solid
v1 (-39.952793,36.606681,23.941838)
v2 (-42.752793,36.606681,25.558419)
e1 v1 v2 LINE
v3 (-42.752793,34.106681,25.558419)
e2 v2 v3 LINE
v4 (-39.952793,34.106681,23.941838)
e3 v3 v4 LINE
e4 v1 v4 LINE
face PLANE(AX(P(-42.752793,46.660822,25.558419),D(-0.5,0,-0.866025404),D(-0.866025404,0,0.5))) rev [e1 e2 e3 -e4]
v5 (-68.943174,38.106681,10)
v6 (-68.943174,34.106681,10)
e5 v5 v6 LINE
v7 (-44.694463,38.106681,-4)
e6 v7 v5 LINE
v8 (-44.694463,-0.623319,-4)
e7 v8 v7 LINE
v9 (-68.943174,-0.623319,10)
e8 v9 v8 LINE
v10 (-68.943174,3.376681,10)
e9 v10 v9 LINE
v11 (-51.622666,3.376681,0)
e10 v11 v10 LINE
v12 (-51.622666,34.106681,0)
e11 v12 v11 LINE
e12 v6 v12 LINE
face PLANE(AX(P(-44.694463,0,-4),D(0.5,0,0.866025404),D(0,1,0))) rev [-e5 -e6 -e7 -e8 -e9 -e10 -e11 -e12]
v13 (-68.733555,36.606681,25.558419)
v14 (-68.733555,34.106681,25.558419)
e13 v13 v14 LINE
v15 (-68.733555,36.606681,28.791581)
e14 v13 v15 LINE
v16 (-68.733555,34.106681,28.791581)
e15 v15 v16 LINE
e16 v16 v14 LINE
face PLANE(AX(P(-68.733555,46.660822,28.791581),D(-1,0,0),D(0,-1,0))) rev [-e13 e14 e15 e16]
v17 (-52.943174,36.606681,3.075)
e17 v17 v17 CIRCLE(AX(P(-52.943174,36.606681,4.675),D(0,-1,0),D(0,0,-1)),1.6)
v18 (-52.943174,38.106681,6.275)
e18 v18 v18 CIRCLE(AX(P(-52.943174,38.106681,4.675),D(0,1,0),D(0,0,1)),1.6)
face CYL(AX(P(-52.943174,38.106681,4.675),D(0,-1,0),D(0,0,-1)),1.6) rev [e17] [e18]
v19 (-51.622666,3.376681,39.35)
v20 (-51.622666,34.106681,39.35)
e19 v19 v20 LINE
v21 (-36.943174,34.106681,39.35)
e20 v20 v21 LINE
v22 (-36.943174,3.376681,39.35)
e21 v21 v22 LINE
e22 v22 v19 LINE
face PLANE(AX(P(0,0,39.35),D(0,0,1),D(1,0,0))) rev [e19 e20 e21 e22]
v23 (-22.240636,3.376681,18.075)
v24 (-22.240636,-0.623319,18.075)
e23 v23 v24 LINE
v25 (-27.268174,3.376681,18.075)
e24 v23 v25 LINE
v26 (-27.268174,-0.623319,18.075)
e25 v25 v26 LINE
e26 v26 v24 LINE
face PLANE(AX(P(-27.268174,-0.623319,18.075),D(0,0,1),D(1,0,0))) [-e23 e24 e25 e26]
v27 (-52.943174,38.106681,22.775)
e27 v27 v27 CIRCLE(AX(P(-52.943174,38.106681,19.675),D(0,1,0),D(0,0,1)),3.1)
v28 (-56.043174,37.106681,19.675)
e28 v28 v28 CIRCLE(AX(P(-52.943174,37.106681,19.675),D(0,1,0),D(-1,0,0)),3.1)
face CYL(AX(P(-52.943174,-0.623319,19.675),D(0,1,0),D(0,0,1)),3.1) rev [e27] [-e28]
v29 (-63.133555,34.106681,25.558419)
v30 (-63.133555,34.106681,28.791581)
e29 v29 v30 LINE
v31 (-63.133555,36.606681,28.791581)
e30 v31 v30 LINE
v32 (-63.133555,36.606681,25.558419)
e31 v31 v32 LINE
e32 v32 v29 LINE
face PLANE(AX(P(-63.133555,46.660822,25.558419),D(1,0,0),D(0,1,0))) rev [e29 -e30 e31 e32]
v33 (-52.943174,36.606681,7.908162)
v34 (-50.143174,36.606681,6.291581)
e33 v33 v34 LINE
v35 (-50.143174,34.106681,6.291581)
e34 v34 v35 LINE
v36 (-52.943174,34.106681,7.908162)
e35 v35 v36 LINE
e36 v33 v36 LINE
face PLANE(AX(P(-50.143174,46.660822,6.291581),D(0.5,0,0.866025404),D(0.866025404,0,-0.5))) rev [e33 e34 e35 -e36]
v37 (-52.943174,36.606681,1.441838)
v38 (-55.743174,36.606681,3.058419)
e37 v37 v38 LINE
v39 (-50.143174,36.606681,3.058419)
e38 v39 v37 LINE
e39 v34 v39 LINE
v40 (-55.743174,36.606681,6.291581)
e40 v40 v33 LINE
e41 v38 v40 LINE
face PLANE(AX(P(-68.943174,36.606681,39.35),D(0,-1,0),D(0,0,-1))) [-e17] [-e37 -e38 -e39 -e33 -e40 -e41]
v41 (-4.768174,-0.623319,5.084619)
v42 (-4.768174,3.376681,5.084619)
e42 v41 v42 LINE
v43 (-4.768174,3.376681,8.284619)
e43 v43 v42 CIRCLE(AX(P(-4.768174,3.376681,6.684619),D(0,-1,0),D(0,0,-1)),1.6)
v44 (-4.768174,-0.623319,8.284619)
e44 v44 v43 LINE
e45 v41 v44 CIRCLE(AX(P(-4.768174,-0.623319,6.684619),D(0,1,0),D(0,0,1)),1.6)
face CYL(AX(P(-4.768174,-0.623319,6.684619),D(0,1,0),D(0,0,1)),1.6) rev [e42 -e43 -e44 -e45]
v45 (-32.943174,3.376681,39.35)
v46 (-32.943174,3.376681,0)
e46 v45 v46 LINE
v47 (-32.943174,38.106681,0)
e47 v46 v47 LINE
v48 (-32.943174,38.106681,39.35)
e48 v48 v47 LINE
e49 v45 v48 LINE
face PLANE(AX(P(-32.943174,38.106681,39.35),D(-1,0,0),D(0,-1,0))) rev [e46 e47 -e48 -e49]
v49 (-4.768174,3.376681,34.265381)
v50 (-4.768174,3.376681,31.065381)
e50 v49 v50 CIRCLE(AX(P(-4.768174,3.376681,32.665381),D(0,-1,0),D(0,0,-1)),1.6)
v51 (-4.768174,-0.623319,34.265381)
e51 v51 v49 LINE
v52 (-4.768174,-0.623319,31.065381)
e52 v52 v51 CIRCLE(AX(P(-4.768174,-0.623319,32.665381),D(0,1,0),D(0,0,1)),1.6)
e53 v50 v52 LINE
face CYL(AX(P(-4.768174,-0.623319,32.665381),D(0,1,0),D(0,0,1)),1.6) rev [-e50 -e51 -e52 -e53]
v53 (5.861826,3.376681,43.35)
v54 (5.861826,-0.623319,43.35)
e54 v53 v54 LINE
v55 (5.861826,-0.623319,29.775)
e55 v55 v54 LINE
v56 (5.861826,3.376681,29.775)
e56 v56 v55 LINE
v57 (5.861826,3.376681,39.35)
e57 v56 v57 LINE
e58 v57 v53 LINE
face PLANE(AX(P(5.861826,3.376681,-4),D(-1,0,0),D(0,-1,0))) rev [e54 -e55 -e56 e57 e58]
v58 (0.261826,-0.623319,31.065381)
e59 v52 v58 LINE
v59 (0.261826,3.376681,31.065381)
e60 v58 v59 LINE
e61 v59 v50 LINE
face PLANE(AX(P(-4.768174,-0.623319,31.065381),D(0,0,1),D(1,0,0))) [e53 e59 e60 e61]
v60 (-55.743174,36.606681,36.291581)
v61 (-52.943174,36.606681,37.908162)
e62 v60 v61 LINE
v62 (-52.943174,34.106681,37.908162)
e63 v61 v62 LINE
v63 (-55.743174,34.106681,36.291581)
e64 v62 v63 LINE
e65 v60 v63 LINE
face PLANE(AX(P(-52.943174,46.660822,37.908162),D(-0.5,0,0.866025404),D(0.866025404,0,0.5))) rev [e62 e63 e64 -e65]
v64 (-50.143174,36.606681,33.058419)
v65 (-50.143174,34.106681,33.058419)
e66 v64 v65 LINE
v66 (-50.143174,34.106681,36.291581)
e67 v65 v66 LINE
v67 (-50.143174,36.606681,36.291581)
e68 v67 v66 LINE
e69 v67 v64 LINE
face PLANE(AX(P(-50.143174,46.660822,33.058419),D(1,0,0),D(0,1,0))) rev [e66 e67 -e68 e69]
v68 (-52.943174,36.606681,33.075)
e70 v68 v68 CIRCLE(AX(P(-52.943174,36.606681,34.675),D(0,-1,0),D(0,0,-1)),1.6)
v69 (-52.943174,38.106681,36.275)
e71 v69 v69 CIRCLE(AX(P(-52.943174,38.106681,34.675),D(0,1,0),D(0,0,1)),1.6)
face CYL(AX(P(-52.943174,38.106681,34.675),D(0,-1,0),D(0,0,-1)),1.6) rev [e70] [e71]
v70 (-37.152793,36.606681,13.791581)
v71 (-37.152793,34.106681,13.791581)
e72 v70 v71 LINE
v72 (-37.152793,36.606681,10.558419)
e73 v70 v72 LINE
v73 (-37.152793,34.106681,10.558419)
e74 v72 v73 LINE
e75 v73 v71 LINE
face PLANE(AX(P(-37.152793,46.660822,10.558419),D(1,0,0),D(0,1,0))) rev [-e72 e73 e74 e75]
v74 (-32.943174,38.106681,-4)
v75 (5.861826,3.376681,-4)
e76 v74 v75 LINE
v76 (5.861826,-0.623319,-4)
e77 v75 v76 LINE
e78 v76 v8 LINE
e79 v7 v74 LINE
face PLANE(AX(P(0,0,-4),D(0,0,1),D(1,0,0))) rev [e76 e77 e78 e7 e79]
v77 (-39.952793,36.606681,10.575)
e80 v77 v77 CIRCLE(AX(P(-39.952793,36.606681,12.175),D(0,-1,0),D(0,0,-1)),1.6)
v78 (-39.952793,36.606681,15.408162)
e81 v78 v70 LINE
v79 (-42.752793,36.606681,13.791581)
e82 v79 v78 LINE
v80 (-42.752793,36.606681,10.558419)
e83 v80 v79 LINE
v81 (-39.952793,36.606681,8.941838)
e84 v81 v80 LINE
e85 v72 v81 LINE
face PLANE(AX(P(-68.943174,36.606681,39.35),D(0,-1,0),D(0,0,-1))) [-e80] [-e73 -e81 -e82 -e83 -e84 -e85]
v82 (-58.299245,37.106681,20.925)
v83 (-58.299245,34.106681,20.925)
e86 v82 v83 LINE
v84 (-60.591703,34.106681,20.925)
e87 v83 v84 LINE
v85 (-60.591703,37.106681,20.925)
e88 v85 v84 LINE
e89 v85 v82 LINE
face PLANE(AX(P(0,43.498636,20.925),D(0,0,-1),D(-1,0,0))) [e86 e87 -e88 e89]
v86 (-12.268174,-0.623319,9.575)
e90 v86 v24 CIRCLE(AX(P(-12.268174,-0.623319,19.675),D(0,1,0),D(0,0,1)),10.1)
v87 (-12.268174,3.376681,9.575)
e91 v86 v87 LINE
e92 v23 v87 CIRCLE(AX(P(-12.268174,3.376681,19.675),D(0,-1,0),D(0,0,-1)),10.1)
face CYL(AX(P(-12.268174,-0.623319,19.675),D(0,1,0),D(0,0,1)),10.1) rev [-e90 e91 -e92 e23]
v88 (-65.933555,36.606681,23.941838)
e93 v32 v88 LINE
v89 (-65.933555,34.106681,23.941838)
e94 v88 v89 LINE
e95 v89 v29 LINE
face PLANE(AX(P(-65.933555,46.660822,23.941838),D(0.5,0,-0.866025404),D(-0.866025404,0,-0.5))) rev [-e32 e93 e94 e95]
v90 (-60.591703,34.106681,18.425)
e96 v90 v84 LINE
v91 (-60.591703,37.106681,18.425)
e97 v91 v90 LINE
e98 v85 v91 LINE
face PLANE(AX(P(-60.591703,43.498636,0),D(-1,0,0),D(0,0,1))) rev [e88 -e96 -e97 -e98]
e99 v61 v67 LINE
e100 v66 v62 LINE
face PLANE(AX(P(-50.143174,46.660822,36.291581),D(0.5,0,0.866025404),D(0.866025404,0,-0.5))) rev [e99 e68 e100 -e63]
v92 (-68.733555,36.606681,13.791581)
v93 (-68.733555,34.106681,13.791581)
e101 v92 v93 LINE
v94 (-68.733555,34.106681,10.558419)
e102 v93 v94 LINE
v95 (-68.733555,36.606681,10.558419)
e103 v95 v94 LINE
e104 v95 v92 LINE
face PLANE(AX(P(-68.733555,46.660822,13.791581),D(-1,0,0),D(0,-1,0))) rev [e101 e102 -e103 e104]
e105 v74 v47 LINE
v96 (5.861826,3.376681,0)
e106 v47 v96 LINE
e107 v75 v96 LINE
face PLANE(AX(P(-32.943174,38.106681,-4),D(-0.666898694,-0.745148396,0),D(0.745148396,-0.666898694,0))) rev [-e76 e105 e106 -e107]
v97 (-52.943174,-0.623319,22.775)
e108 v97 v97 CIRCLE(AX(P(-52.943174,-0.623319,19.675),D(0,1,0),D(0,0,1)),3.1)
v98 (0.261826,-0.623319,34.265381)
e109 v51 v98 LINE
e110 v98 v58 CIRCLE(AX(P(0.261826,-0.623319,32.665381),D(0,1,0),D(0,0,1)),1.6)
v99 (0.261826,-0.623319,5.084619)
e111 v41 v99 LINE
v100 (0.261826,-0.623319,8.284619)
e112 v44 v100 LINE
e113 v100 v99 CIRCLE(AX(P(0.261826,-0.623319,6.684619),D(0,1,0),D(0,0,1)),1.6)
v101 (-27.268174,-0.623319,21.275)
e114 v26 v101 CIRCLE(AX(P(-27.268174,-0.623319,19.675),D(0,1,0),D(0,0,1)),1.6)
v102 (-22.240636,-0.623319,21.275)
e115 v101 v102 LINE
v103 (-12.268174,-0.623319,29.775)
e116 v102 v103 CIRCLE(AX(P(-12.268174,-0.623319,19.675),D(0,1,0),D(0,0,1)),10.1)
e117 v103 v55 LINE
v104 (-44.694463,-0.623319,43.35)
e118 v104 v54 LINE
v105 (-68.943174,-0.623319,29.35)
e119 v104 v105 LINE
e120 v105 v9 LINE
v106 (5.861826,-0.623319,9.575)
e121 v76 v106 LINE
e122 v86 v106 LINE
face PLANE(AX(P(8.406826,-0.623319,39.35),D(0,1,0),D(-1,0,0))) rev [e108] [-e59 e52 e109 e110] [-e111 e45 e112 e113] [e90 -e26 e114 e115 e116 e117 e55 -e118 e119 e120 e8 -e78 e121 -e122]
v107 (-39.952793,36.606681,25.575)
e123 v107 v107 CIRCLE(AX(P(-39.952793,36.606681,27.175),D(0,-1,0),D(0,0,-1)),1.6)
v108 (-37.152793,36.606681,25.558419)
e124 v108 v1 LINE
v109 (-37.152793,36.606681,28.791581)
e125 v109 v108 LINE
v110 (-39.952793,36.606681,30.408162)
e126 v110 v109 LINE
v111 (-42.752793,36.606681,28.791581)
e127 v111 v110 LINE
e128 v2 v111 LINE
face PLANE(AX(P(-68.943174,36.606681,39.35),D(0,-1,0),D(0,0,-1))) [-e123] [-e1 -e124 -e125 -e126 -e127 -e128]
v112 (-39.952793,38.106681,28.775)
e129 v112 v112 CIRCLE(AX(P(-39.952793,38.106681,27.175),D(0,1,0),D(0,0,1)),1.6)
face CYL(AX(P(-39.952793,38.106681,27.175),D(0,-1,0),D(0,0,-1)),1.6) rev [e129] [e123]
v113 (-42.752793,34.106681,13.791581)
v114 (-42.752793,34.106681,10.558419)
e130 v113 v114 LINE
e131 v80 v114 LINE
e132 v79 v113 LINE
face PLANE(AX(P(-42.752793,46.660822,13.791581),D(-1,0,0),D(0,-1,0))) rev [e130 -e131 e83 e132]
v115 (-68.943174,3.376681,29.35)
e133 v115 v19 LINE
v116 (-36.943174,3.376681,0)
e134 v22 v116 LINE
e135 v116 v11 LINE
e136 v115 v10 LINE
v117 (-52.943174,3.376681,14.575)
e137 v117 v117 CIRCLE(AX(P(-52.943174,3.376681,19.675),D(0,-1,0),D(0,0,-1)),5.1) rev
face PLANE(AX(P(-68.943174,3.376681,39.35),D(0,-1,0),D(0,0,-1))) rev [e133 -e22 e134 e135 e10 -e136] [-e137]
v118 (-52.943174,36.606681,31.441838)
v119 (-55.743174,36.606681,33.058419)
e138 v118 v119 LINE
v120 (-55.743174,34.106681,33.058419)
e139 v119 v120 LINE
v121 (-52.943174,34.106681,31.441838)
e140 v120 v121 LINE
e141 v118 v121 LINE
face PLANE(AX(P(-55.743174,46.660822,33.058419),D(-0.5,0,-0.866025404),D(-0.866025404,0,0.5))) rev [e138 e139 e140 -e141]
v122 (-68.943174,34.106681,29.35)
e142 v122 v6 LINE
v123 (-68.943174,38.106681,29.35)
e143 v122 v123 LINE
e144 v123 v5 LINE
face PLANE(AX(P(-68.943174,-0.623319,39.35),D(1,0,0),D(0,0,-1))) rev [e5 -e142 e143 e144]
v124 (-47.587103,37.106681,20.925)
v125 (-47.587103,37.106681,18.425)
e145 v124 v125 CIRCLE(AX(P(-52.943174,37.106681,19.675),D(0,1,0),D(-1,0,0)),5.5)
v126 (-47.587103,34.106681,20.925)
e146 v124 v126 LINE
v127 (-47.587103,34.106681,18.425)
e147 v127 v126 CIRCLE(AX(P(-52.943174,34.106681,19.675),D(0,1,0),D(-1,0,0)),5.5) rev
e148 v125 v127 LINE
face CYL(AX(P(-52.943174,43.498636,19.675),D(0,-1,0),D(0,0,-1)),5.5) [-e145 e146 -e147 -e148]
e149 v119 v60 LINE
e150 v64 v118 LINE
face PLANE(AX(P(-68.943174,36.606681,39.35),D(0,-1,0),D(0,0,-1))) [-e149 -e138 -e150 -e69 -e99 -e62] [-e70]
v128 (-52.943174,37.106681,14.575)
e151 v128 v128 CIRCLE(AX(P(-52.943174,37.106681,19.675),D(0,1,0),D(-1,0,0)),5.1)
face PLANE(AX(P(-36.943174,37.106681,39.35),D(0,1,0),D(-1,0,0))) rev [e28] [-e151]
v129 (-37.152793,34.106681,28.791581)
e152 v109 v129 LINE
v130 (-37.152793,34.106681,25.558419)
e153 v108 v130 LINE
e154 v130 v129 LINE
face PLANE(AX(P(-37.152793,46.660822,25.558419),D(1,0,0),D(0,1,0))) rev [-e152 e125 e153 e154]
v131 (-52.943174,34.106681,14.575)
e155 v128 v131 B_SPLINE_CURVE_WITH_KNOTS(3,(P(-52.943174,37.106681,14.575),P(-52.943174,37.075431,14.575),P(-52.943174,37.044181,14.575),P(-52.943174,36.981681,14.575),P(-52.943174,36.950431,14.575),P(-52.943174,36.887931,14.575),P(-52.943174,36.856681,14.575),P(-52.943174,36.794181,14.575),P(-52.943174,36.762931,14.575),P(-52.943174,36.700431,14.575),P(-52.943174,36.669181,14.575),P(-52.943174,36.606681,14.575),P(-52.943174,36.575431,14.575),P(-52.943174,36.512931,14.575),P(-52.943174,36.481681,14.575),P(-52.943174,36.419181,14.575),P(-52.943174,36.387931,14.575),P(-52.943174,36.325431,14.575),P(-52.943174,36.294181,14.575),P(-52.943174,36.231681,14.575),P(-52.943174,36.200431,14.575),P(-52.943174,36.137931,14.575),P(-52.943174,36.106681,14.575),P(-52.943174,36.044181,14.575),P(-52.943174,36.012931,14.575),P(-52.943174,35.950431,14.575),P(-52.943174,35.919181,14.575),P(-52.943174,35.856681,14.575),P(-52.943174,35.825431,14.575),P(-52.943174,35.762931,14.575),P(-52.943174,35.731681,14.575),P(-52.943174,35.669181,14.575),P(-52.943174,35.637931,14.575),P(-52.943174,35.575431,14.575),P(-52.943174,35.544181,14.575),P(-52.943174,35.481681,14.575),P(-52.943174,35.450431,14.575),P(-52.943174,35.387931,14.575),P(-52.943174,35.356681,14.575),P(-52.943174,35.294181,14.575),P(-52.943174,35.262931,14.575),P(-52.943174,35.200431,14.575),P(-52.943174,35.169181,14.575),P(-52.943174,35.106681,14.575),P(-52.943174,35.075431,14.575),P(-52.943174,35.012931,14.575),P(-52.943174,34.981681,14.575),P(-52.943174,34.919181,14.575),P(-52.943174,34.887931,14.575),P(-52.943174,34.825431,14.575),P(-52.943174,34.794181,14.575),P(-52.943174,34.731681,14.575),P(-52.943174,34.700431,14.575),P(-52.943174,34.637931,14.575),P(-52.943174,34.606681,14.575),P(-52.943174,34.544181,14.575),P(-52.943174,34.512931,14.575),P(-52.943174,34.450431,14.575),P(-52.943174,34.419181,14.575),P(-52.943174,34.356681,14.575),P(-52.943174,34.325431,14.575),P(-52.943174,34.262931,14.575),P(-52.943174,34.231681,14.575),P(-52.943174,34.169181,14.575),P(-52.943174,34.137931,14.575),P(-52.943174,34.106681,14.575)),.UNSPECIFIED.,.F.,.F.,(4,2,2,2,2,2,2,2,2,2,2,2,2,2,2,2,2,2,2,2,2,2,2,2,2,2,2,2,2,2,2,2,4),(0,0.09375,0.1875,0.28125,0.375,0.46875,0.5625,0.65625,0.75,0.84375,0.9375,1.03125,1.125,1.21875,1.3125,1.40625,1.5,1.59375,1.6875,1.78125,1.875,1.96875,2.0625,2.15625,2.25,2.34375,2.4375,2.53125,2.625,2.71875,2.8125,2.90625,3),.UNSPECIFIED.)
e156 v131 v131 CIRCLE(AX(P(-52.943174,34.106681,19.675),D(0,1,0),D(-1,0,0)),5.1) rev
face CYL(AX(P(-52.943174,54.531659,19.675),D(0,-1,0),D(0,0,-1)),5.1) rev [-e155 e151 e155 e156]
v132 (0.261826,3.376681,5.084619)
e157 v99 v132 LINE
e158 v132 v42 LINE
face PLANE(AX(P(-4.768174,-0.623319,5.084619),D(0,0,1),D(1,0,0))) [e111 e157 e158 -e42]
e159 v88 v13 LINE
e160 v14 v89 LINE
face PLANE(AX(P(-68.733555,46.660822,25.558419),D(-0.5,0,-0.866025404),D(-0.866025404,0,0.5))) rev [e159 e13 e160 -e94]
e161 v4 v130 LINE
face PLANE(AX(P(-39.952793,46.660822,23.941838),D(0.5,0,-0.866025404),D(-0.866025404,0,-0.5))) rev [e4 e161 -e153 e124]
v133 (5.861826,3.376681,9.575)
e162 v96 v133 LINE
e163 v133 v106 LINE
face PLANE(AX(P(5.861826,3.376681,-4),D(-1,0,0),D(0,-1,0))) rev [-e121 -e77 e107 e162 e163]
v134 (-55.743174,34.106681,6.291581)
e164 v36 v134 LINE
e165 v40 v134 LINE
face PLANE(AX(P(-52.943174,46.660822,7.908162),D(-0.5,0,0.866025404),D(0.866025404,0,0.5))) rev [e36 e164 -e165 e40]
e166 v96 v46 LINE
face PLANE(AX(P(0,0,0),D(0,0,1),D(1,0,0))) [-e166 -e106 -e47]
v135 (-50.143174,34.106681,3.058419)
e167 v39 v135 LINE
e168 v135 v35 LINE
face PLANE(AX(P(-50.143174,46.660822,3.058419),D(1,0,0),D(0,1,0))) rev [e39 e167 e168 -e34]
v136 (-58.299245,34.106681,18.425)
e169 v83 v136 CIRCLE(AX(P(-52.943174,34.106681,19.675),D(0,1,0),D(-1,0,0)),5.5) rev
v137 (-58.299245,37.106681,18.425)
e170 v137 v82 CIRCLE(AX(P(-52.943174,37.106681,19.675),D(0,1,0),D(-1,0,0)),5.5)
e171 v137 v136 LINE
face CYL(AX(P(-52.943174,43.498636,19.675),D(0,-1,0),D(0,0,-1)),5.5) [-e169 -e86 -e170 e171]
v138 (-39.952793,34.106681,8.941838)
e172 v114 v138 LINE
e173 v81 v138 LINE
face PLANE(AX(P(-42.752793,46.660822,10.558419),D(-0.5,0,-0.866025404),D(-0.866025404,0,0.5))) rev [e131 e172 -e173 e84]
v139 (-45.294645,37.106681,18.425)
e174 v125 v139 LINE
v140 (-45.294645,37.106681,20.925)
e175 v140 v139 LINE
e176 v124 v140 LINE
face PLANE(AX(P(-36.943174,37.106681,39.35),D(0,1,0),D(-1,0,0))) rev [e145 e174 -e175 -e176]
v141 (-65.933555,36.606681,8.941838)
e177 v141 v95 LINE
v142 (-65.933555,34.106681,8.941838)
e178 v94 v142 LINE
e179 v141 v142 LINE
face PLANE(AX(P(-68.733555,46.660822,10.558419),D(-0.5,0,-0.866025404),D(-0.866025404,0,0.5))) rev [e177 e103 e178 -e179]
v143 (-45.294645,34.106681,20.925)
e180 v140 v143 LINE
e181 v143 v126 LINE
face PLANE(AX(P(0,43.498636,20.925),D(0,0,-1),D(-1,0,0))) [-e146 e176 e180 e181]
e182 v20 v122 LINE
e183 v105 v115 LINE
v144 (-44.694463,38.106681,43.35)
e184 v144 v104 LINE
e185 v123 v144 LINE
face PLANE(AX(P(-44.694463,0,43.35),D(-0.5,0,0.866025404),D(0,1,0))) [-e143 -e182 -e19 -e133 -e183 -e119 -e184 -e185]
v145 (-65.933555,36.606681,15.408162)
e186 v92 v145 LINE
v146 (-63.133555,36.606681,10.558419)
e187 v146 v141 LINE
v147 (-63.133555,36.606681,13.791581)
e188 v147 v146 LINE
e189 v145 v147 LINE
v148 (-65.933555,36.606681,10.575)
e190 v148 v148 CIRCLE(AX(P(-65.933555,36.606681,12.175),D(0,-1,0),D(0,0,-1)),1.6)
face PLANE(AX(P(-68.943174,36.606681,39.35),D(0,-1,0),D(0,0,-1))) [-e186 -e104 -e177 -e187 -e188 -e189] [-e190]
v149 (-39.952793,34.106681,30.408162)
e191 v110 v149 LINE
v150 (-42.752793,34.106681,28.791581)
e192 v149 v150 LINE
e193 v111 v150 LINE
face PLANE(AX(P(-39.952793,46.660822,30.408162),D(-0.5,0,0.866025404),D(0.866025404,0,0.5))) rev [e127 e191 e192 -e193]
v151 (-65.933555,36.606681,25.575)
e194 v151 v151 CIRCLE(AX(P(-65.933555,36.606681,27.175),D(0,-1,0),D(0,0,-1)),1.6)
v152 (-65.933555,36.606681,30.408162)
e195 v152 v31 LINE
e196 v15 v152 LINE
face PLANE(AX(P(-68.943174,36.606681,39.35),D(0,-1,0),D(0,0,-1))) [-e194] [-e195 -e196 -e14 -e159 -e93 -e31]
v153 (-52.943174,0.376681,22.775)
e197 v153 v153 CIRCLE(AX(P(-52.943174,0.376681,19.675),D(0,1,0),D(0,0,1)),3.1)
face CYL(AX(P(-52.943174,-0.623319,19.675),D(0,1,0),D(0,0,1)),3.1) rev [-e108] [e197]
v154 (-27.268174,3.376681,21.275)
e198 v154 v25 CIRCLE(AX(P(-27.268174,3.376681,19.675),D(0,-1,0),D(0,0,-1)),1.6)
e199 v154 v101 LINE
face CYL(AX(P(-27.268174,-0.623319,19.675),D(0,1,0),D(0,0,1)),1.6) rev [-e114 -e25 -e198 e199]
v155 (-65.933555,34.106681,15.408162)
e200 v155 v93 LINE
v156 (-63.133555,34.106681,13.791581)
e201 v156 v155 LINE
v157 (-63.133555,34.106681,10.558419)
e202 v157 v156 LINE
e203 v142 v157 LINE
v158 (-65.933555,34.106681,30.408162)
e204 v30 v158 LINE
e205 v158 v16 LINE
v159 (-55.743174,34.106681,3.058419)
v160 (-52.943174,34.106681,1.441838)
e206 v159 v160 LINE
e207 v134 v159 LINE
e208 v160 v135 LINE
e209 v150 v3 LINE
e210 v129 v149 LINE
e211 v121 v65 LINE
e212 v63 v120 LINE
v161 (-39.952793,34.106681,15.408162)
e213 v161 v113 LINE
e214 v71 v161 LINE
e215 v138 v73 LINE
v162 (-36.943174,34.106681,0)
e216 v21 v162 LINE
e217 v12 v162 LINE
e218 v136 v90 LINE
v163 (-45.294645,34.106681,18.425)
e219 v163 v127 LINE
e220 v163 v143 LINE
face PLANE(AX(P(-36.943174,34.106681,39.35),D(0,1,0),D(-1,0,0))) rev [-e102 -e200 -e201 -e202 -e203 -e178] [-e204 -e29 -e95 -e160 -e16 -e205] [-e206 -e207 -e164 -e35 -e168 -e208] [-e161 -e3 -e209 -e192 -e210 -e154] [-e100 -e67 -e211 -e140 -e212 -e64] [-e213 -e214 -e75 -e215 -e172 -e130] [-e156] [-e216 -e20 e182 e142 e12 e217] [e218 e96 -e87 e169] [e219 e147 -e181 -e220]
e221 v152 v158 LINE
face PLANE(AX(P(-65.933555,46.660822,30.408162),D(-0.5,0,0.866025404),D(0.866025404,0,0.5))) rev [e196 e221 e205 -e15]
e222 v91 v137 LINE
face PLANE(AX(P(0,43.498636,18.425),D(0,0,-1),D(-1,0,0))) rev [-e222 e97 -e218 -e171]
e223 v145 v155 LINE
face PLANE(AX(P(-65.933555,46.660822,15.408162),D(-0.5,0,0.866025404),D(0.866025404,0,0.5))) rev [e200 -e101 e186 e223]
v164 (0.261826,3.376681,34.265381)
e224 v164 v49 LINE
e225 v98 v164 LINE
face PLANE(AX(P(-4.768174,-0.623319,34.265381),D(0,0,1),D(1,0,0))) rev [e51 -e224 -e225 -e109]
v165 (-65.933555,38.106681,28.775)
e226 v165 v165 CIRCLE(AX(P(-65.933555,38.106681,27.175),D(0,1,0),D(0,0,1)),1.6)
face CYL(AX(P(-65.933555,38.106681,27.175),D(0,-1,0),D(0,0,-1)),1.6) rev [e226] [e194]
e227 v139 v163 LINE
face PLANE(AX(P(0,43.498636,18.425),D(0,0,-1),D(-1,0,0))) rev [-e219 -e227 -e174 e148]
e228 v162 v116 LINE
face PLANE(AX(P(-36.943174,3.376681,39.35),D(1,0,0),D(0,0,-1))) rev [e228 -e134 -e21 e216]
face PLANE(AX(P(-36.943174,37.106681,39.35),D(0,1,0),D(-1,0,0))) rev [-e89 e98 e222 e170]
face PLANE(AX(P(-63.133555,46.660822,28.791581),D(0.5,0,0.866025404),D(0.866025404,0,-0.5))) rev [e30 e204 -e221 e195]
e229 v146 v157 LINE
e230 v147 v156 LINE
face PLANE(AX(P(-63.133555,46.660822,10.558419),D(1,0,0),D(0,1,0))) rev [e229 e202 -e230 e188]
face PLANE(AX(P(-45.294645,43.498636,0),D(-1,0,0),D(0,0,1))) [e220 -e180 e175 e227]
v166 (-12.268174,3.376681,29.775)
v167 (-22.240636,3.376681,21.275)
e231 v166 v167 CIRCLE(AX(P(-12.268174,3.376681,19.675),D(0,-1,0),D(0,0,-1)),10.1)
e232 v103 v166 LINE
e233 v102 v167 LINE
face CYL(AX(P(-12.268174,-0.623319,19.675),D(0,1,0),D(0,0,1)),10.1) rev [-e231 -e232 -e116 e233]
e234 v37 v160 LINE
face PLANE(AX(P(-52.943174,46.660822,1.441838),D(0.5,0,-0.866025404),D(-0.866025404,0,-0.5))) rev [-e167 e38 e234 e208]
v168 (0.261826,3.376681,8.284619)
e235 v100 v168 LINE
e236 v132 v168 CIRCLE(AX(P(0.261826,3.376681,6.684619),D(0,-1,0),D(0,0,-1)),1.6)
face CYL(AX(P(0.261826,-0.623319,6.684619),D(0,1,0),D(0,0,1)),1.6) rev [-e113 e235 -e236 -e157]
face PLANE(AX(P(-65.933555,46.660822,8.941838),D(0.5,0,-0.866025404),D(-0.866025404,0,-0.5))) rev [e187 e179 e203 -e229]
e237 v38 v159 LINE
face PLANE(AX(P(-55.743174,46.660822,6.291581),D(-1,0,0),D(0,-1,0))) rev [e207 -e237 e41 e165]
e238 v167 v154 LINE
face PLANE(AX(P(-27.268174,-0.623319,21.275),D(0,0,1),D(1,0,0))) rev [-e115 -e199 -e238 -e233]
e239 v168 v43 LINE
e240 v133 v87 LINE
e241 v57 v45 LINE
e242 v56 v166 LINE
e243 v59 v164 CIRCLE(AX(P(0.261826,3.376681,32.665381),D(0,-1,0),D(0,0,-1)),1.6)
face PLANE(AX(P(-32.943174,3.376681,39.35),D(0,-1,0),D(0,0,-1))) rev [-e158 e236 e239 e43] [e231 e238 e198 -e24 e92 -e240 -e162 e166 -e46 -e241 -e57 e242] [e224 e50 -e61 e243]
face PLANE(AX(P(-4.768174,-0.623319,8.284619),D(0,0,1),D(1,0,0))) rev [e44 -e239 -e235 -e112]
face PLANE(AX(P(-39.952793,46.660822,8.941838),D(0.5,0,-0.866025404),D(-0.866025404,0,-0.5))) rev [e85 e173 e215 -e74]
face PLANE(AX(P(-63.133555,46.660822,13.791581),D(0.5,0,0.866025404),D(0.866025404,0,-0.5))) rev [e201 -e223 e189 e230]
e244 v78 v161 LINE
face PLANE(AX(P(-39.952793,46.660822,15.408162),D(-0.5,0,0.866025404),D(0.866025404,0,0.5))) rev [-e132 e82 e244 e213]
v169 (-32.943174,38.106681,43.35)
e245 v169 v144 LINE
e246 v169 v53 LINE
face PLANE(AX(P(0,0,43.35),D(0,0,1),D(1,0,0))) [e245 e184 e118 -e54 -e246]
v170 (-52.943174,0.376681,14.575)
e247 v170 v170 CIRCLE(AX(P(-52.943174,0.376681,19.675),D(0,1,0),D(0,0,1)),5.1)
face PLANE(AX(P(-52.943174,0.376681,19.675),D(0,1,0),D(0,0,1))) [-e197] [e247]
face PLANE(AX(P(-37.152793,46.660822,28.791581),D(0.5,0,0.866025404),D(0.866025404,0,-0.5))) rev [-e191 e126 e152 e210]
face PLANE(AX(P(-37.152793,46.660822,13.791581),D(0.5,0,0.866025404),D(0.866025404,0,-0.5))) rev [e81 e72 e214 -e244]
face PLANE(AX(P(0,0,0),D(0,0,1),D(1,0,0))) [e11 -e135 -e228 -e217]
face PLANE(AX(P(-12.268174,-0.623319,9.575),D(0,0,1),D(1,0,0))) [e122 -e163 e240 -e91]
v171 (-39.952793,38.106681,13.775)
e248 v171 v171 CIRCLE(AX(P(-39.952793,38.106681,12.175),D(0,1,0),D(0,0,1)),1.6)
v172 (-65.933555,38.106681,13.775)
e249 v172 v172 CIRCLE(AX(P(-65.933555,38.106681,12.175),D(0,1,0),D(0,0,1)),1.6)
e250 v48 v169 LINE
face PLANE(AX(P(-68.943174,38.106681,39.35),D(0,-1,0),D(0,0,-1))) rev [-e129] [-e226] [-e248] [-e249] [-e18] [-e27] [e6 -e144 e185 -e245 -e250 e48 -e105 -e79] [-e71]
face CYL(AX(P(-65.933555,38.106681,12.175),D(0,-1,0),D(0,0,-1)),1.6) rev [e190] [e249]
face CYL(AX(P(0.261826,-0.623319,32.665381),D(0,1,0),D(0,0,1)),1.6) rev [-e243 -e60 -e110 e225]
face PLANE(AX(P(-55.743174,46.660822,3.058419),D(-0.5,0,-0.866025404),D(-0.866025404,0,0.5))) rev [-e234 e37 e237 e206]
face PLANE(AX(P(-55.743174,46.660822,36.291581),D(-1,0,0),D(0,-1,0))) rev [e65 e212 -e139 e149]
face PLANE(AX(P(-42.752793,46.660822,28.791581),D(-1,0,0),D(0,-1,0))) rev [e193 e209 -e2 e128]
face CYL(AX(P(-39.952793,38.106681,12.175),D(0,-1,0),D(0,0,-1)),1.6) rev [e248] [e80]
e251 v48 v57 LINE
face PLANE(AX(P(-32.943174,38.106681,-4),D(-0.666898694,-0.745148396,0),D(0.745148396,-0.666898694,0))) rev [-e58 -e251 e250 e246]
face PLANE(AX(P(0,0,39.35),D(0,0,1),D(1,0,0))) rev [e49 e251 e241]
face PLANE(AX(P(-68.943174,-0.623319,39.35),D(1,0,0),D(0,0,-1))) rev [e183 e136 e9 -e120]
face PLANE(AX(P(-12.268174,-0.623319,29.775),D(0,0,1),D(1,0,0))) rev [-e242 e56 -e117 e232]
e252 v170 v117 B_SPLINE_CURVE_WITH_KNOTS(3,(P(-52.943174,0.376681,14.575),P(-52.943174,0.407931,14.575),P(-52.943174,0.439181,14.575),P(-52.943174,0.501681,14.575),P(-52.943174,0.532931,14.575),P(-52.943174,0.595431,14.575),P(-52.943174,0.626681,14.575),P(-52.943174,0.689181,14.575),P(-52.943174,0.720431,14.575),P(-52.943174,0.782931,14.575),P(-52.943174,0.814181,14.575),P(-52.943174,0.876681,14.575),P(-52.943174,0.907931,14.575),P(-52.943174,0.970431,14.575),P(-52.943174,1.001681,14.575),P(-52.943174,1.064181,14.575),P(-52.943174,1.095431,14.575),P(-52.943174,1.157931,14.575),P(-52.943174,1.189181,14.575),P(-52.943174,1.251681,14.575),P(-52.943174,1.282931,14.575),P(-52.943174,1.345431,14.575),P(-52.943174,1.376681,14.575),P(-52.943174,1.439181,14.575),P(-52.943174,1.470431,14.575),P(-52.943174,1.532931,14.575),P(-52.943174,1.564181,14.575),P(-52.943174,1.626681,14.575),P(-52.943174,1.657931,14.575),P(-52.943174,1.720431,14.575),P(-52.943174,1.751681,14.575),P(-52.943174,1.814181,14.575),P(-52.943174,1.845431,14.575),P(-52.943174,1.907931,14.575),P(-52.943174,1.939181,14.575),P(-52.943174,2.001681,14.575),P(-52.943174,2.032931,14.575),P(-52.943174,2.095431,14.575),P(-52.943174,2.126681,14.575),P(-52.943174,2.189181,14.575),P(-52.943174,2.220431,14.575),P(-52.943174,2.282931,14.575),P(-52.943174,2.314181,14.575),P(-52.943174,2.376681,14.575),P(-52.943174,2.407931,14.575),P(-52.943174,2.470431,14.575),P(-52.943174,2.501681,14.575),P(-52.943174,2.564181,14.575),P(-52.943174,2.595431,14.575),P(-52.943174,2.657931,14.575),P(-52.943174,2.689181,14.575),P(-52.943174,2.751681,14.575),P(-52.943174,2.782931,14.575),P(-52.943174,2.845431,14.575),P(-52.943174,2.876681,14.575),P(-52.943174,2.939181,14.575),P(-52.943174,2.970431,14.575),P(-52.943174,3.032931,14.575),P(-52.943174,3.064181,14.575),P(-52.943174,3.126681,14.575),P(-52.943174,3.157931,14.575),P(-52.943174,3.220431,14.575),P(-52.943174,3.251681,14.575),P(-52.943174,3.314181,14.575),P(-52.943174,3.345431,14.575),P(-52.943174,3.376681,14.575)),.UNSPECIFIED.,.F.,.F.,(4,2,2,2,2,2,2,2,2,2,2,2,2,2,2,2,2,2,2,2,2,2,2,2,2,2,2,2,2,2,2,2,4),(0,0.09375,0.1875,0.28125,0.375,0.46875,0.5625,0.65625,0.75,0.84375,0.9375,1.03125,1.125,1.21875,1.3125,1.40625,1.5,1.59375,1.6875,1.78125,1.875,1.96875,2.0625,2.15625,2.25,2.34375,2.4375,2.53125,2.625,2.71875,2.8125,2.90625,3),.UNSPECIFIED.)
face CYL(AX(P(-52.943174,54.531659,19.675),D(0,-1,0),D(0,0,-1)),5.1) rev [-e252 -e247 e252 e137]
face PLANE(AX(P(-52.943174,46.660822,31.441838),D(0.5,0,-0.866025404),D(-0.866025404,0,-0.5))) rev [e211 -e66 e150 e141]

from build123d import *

# Parameters (mm, degrees)
BOSS_EXTRUDE1_DEPTH     = 39.35
CUT_EXTRUDE2_DEPTH      = 33.73
CUT_EXTRUDE2_DEPTH_BACK = 3
SKETCH3_R               = 5.1
CUT_EXTRUDE3_DEPTH      = 33.73
CUT_EXTRUDE4_DEPTH      = 87.647311883
CUT_EXTRUDE4_DEPTH_BACK = 87.647311883
SKETCH3_5_R             = 3.1
SKETCH3_5_R_2           = 10.1
SKETCH3_5_R_3           = 1.6
SKETCH3_5_W             = 20.675
SKETCH3_5_H             = 20.2
SKETCH3_5_W_2           = 5.027537917
SKETCH3_5_H_2           = 3.2
SKETCH3_5_W_3           = 5.03
SKETCH3_6_R             = 1.6
CUT_EXTRUDE5_DEPTH      = 87.647311883
SKETCH4_W               = 77.35
SKETCH4_H               = 38.73
BOSS_EXTRUDE2_DEPTH     = 4
SKETCH5_W               = 77.35
SKETCH5_H               = 38.73
BOSS_EXTRUDE3_DEPTH     = 4
CUT_EXTRUDE6_DEPTH      = 92.909209967
CUT_EXTRUDE6_DEPTH_BACK = 92.909209967
CUT_EXTRUDE7_DEPTH      = 2.5
CHAMFER1_SIZE           = 14
CHAMFER1_SIZE_2         = 24.248711306


with BuildPart() as part:
    # Sketch1 → Boss-Extrude1 (new body)
    with BuildSketch(Plane.XY):
        Polygon((-68.943174111, 38.106680783), (-32.943174111, 38.106680783), (-32.943174111, 3.376680783), (8.406825889, 3.376680783), (8.406825889, -0.623319217), (-68.943174111, -0.623319217), (-68.943174111, 3.376680783), (-36.943174111, 3.376680783), (-36.943174111, 34.106680783), (-68.943174111, 34.106680783), align=None)
    extrude(amount=BOSS_EXTRUDE1_DEPTH)

    # Sketch3 → Cut-Extrude2 (cut, two sides: drawn at the far end of the back side and taken through both)
    with BuildSketch(Plane(origin=(0, 3.376680783, 0), x_dir=(1, 0, 0), z_dir=(0, 1, 0)).offset(-CUT_EXTRUDE2_DEPTH_BACK)):
        with Locations(Location((-52.943174111, -19.675, 0), (0, 0, 90))):
            Circle(SKETCH3_R)
    extrude(amount=CUT_EXTRUDE2_DEPTH + CUT_EXTRUDE2_DEPTH_BACK, mode=Mode.SUBTRACT)

    # Sketch3<4> → Cut-Extrude3 (cut)
    with BuildSketch(Plane(origin=(0, 3.376680783, 0), x_dir=(1, 0, 0), z_dir=(0, 1, 0))):
        with BuildLine():
            Line((-47.58710279, -20.925), (-45.294644841, -20.925))
            Line((-45.294644841, -20.925), (-45.294644841, -18.425))
            Line((-45.294644841, -18.425), (-47.58710279, -18.425))
            ThreePointArc((-47.58710279, -18.425), (-47.479274758, -19.045870549), (-47.443174111, -19.675))
            ThreePointArc((-47.443174111, -19.675), (-47.479274758, -20.304129451), (-47.58710279, -20.925))
        make_face()
        with BuildLine():
            Line((-60.591703381, -18.425), (-60.591703381, -20.925))
            Line((-60.591703381, -20.925), (-58.299245432, -20.925))
            ThreePointArc((-58.299245432, -20.925), (-58.443174111, -19.675), (-58.299245432, -18.425))
            Line((-58.299245432, -18.425), (-60.591703381, -18.425))
        make_face()
    extrude(amount=CUT_EXTRUDE3_DEPTH, mode=Mode.SUBTRACT)

    # Sketch3<5> → Cut-Extrude4 (cut, two sides: drawn at the far end of the back side and taken through both)
    with BuildSketch(Plane(origin=(0, 3.376680783, 0), x_dir=(1, 0, 0), z_dir=(0, 1, 0)).offset(-CUT_EXTRUDE4_DEPTH_BACK)):
        with Locations(Location((-52.943174111, -19.675, 0), (0, 0, 270))):
            Circle(SKETCH3_5_R)
        with Locations((-12.268174111, -19.675)):
            Circle(SKETCH3_5_R_2)
        with Locations((-4.768174111, -32.665381057)):
            Circle(SKETCH3_5_R_3)
        with Locations((-4.768174111, -6.684618943)):
            Circle(SKETCH3_5_R_3)
        with Locations((-27.268174111, -19.675)):
            Circle(SKETCH3_5_R_3)
        with Locations((0.261825889, -32.665381057)):
            Circle(SKETCH3_5_R_3)
        with Locations((0.261825889, -6.684618943)):
            Circle(SKETCH3_5_R_3)
        with Locations((-1.930674111, -19.675)):
            Rectangle(SKETCH3_5_W, SKETCH3_5_H)
        with Locations((-24.754405152, -19.675)):
            Rectangle(SKETCH3_5_W_2, SKETCH3_5_H_2)
        with Locations((-2.253174111, -32.665381057)):
            Rectangle(SKETCH3_5_W_3, SKETCH3_5_H_2)
        with Locations((-2.253174111, -6.684618943)):
            Rectangle(SKETCH3_5_W_3, SKETCH3_5_H_2)
    extrude(amount=CUT_EXTRUDE4_DEPTH + CUT_EXTRUDE4_DEPTH_BACK, mode=Mode.SUBTRACT)

    # Sketch3<6> → Cut-Extrude5 (cut, through all)
    with BuildSketch(Plane(origin=(0, 3.376680783, 0), x_dir=(1, 0, 0), z_dir=(0, 1, 0))):
        with Locations(Location((-52.943174111, -34.675, 0), (0, 0, 180))):
            Circle(SKETCH3_6_R)
        with Locations(Location((-65.933555168, -27.175, 0), (0, 0, 180))):
            Circle(SKETCH3_6_R)
        with Locations(Location((-65.933555168, -12.175, 0), (0, 0, 180))):
            Circle(SKETCH3_6_R)
        with Locations(Location((-52.943174111, -4.675, 0), (0, 0, 180))):
            Circle(SKETCH3_6_R)
        with Locations(Location((-39.952793054, -12.175, 0), (0, 0, 180))):
            Circle(SKETCH3_6_R)
        with Locations(Location((-39.952793054, -27.175, 0), (0, 0, 180))):
            Circle(SKETCH3_6_R)
    extrude(amount=CUT_EXTRUDE5_DEPTH, mode=Mode.SUBTRACT)

    # Sketch4 → Boss-Extrude2 (add)
    with BuildSketch(Plane.XY.offset(39.35)):
        with Locations((-30.268174111, 18.741680783)):
            Rectangle(SKETCH4_W, SKETCH4_H)
    extrude(amount=BOSS_EXTRUDE2_DEPTH)

    # Sketch5 → Boss-Extrude3 (add)
    with BuildSketch(Plane(origin=(0, 0, 0), x_dir=(-1, 0, 0), z_dir=(0, 0, -1))):
        with Locations((30.268174111, 18.741680783)):
            Rectangle(SKETCH5_W, SKETCH5_H)
    extrude(amount=BOSS_EXTRUDE3_DEPTH)

    # Sketch6 → Cut-Extrude6 (cut, two sides: drawn at the far end of the back side and taken through both)
    with BuildSketch(Plane.XY.offset(43.35).offset(-CUT_EXTRUDE6_DEPTH_BACK)):
        Polygon((-32.943174111, 38.106680783), (5.861825889, 3.376680783), (5.861825889, -0.623319217), (8.406825889, -0.623319217), (8.406825889, 38.106680783), align=None)
    extrude(amount=CUT_EXTRUDE6_DEPTH + CUT_EXTRUDE6_DEPTH_BACK, mode=Mode.SUBTRACT)

    # Sketch8 → Cut-Extrude7 (cut)
    with BuildSketch(Plane.XZ.offset(-34.106680783)):
        Polygon((-65.933555168, 15.408161507), (-68.733555168, 13.791580754), (-68.733555168, 10.558419246), (-65.933555168, 8.941838493), (-63.133555168, 10.558419246), (-63.133555168, 13.791580754), align=None)
        Polygon((-65.933555168, 30.408161507), (-68.733555168, 28.791580754), (-68.733555168, 25.558419246), (-65.933555168, 23.941838493), (-63.133555168, 25.558419246), (-63.133555168, 28.791580754), align=None)
        Polygon((-52.943174111, 1.441838493), (-50.143174111, 3.058419246), (-50.143174111, 6.291580754), (-52.943174111, 7.908161507), (-55.743174111, 6.291580754), (-55.743174111, 3.058419246), align=None)
        Polygon((-39.952793054, 8.941838493), (-37.152793054, 10.558419246), (-37.152793054, 13.791580754), (-39.952793054, 15.408161507), (-42.752793054, 13.791580754), (-42.752793054, 10.558419246), align=None)
        Polygon((-39.952793054, 23.941838493), (-37.152793054, 25.558419246), (-37.152793054, 28.791580754), (-39.952793054, 30.408161507), (-42.752793054, 28.791580754), (-42.752793054, 25.558419246), align=None)
        Polygon((-52.943174111, 37.908161507), (-55.743174111, 36.291580754), (-55.743174111, 33.058419246), (-52.943174111, 31.441838493), (-50.143174111, 33.058419246), (-50.143174111, 36.291580754), align=None)
    extrude(amount=-CUT_EXTRUDE7_DEPTH, mode=Mode.SUBTRACT)

    # Chamfer1
    # the kernel refuses this chamfer: 24.248711306, 14 mm, written as the material it takes off along each edge
    with BuildSketch(Plane(origin=(-68.943174111, -63.356814805, 43.35), x_dir=(-0.05789386240267122, 0, -0.9983227437537925), z_dir=(0, 1, 0))) as chamfer1_piece_1:
        Polygon((CHAMFER1_SIZE * 0.998322743754, -CHAMFER1_SIZE * 0.0578938624027), (-CHAMFER1_SIZE_2 * 0.0578938624026, -CHAMFER1_SIZE_2 * 0.998322743752), (0, 0), align=None)
    extrude(amount=164.196991176, mode=Mode.SUBTRACT)
    with BuildSketch(Plane(origin=(-68.943174111, -63.356814805, -4), x_dir=(-0.05789386240267123, 0, 0.9983227437537925), z_dir=(0, 1, 0))) as chamfer1_piece_2:
        Polygon((CHAMFER1_SIZE * 0.998322743754, CHAMFER1_SIZE * 0.0578938624027), (-CHAMFER1_SIZE_2 * 0.0578938624026, CHAMFER1_SIZE_2 * 0.998322743752), (0, 0), align=None)
    extrude(amount=164.196991176, mode=Mode.SUBTRACT)


solid = part.part
